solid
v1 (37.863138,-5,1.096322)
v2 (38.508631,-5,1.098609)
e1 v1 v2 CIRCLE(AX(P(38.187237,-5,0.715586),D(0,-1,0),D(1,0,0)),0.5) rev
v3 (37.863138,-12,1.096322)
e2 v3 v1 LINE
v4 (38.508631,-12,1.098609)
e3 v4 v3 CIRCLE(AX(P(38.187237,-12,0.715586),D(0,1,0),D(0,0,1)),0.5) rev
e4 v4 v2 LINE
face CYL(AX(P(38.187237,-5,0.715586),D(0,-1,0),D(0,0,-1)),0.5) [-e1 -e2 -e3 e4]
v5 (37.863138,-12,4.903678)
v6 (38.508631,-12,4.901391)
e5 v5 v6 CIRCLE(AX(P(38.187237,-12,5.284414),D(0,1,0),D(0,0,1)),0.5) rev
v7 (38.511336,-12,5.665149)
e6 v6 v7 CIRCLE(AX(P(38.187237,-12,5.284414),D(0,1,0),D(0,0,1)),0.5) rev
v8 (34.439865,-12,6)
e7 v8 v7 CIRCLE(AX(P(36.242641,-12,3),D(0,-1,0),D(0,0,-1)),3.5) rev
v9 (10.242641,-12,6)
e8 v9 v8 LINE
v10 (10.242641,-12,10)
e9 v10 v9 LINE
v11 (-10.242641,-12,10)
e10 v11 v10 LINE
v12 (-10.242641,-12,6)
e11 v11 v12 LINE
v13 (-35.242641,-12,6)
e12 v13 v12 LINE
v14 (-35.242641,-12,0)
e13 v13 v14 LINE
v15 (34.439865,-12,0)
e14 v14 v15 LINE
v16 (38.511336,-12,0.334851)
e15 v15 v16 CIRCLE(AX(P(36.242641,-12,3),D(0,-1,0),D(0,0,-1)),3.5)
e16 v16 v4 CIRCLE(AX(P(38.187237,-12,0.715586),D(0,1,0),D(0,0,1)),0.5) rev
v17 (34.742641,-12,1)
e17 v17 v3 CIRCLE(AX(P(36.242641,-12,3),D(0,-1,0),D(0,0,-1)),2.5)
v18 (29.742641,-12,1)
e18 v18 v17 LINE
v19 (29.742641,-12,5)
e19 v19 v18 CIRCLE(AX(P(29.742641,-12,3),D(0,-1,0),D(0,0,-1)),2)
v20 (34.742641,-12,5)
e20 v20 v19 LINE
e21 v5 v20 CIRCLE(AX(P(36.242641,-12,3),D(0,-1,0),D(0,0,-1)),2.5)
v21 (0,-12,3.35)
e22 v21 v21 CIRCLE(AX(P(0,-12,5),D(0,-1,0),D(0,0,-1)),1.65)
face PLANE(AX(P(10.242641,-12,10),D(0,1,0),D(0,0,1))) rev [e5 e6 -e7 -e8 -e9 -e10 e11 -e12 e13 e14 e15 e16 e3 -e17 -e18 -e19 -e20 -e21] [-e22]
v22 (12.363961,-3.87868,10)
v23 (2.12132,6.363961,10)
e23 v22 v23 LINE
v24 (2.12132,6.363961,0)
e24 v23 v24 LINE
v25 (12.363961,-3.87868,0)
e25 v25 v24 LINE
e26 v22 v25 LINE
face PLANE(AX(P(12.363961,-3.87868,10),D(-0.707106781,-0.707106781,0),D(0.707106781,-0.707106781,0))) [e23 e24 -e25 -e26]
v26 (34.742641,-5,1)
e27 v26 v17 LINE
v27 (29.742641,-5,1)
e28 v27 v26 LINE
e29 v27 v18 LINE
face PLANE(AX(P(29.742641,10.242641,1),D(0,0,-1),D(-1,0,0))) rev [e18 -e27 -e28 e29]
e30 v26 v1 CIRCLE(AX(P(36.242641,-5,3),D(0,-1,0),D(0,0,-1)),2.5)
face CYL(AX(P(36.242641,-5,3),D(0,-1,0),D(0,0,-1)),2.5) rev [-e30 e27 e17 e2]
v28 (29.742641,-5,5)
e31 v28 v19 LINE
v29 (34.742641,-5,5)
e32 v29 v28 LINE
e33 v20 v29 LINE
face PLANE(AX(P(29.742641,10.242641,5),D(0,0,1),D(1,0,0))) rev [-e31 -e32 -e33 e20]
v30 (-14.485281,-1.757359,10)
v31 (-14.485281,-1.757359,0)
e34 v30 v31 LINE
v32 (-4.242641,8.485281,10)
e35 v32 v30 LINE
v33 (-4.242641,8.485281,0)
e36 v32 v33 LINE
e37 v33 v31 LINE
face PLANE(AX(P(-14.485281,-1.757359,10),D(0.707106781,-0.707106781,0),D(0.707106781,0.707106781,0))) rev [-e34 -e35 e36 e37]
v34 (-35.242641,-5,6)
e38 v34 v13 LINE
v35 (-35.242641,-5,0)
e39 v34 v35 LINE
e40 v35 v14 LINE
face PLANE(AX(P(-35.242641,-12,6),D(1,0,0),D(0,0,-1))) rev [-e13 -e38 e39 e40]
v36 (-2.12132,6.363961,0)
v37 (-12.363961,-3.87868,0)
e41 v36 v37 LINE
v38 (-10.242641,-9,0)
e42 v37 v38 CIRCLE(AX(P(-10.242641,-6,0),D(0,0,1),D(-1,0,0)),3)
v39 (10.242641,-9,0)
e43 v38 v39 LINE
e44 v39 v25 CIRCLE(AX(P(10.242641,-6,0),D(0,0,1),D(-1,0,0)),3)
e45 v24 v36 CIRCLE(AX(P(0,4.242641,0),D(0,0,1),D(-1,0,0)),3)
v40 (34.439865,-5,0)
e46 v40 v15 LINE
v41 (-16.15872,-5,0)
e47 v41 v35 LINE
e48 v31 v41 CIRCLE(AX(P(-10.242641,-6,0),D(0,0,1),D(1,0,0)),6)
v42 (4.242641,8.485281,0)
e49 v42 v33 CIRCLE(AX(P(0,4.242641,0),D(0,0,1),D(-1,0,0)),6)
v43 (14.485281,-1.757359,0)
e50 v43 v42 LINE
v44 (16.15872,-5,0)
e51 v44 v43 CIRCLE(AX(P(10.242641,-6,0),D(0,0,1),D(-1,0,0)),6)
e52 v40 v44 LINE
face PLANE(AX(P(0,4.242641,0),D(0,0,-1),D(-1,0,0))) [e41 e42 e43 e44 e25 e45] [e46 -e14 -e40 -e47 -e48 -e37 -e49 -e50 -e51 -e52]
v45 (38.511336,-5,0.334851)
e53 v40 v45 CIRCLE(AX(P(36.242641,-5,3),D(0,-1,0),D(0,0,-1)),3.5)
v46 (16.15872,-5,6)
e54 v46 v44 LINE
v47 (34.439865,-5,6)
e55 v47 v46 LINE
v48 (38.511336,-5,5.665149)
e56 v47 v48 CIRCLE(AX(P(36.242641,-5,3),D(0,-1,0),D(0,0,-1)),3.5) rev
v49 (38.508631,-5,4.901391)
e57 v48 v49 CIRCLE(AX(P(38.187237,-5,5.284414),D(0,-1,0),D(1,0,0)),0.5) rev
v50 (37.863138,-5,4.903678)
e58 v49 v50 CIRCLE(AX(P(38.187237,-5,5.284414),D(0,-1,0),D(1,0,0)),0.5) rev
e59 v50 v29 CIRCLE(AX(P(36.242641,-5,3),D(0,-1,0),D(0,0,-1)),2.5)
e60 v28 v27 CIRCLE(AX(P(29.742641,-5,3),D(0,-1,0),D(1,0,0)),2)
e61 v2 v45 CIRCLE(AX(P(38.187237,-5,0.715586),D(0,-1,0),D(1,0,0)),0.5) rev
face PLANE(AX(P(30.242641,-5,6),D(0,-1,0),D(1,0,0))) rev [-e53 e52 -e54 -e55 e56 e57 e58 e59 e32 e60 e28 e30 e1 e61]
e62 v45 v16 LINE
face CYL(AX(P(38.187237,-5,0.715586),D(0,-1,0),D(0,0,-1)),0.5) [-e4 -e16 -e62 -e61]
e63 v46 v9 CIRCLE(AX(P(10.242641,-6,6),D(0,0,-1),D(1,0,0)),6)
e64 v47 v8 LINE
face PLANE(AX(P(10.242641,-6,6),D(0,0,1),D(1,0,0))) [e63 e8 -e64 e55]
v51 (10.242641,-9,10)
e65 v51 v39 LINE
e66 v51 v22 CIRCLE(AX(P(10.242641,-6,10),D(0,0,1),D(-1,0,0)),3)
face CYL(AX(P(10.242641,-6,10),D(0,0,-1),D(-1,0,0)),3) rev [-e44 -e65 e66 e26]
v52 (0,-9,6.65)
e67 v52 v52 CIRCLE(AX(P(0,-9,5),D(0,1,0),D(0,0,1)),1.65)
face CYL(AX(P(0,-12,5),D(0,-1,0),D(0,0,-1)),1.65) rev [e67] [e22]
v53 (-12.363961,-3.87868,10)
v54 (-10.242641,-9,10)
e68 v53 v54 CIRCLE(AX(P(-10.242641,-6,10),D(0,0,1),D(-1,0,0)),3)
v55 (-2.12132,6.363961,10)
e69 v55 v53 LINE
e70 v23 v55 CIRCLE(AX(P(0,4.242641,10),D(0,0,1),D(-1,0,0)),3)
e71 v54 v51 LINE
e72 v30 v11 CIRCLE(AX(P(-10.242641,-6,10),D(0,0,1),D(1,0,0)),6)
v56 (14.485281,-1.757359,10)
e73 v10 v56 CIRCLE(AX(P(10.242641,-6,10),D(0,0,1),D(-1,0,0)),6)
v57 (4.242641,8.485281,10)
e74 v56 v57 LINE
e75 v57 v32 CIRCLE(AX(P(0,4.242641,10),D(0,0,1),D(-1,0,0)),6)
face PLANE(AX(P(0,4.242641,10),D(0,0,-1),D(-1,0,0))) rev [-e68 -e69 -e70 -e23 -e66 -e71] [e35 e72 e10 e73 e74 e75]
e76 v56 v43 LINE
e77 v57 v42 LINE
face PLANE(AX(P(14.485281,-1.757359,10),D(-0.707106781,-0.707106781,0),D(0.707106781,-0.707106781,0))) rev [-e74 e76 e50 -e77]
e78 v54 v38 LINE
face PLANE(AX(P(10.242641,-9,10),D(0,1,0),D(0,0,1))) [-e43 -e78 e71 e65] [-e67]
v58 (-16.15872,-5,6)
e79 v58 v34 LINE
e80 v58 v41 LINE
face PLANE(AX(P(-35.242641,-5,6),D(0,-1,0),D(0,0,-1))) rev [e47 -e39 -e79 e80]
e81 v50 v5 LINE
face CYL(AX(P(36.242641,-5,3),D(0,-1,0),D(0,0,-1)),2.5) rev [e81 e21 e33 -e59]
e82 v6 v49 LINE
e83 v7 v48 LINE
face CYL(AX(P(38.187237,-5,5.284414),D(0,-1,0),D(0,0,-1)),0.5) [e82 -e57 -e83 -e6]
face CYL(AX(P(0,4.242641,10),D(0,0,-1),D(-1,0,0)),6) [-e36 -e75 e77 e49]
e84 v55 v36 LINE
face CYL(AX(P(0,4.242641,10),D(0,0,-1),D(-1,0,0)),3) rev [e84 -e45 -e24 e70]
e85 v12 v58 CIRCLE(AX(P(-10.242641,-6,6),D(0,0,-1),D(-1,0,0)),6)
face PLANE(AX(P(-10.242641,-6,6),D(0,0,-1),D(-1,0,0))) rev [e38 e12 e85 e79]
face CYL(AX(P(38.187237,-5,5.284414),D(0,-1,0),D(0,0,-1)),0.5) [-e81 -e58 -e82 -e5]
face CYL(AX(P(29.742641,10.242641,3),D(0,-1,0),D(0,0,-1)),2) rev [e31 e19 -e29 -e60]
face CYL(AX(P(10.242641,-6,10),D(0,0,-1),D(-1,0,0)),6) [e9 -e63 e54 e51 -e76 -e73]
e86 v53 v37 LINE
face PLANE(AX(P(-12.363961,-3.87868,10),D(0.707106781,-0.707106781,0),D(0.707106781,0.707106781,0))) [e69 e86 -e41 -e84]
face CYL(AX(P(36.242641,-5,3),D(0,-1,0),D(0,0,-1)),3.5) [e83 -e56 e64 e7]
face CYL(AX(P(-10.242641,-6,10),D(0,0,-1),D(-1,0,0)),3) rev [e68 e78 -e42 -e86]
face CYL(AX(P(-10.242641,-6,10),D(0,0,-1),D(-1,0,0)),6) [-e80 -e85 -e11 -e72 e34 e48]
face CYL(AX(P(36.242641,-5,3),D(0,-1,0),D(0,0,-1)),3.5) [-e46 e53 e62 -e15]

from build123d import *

# Parameters (mm, degrees)
BOSS_EXTRU_4_DEPTH      = 10
TROU_TARAUD_M43_REACH   = 29.992
TROU_TARAUD_M43_BORE_R  = 1.65
BOSS_EXTRU_5_DEPTH      = 6
BOSS_EXTRU_8_DEPTH      = 7
CONG_1_R                = 0.5
ENL_V_MAT_EXTRU_1_DEPTH = 46.732281958


with BuildPart() as part:
    # Esquisse5 → Boss.-Extru.4 (new body)
    with BuildSketch(Plane.XY):
        with BuildLine():
            Line((-14.485281374, -1.757359313), (-4.242640687, 8.485281374))
            ThreePointArc((-4.242640687, 8.485281374), (0, 10.242640687), (4.242640687, 8.485281374))
            Line((4.242640687, 8.485281374), (14.485281374, -1.757359313))
            ThreePointArc((14.485281374, -1.757359313), (15.785917882, -8.296100594), (10.242640687, -12))
            Line((10.242640687, -12), (-10.242640687, -12))
            ThreePointArc((-10.242640687, -12), (-15.785917882, -8.296100594), (-14.485281374, -1.757359313))
        make_face()
        with BuildLine():
            Line((10.242640687, -9), (-10.242640687, -9))
            ThreePointArc((-10.242640687, -9), (-13.014279285, -7.148050297), (-12.363961031, -3.878679656))
            Line((-12.363961031, -3.878679656), (-2.121320344, 6.363961031))
            ThreePointArc((-2.121320344, 6.363961031), (0, 7.242640687), (2.121320344, 6.363961031))
            Line((2.121320344, 6.363961031), (12.363961031, -3.878679656))
            ThreePointArc((12.363961031, -3.878679656), (13.014279285, -7.148050297), (10.242640687, -9))
        make_face(mode=Mode.SUBTRACT)
    extrude(amount=BOSS_EXTRU_4_DEPTH)

    # Trou taraudé M43 bore (on position points) → Trou taraudé M43 (cut, up to next)
    with BuildSketch(Plane(origin=(0, -12, 5), x_dir=(0, 0, -1), z_dir=(0, -1, 0)), mode=Mode.PRIVATE) as trou_taraud_m43_sk1:
        Circle(TROU_TARAUD_M43_BORE_R)
    trou_taraud_m43_tool1 = extrude(trou_taraud_m43_sk1.sketch, amount=-TROU_TARAUD_M43_REACH, mode=Mode.PRIVATE) & part.part
    add(trou_taraud_m43_tool1.solids().sort_by_distance((0, -12, 5))[0], mode=Mode.SUBTRACT)

    # Esquisse13 → Boss.-Extru.5 (add)
    with BuildSketch(Plane.XY):
        with BuildLine():
            Line((-10.242640687, -12), (-35.242640687, -12))
            Line((-35.242640687, -12), (-35.242640687, -5))
            Line((-35.242640687, -5), (-16.15872047, -5))
            ThreePointArc((-16.15872047, -5), (-14.825216382, -9.872983346), (-10.242640687, -12))
        make_face()
        with BuildLine():
            Line((10.242640687, -12), (30.242640687, -12))
            Line((30.242640687, -12), (30.242640687, -5))
            Line((30.242640687, -5), (16.15872047, -5))
            ThreePointArc((16.15872047, -5), (14.825216382, -9.872983346), (10.242640687, -12))
        make_face()
    extrude(amount=BOSS_EXTRU_5_DEPTH)

    # Esquisse18 → Boss.-Extru.8 (add)
    with BuildSketch(Plane(origin=(0, -12, 0), x_dir=(-1, 0, 0), z_dir=(0, -1, 0))):
        with BuildLine():
            Line((-30.242640687, 0), (-34.439865049, 0))
            ThreePointArc((-34.439865049, 0), (-36.820225395, 0.452013312), (-38.923796238, -0.750243366))
            Line((-38.923796238, -0.750243366), (-38.157751795, -1.393030976))
            ThreePointArc((-38.157751795, -1.393030976), (-33.742640687, -3), (-38.157751795, -4.606969024))
            Line((-38.157751795, -4.606969024), (-38.923796238, -5.249756634))
            ThreePointArc((-38.923796238, -5.249756634), (-36.820225395, -6.452013312), (-34.439865049, -6))
            Line((-34.439865049, -6), (-30.242640687, -6))
            Line((-30.242640687, -6), (-30.242640687, 0))
        make_face()
    extrude(amount=-BOSS_EXTRU_8_DEPTH)

    # Congé1
    cong_1_edges = [part.edges().sort_by_distance(p)[0] for p in [
        (38.157751795, -8.5, 1.393030976),
        (38.923796238, -8.5, 0.750243366),
        (38.923796238, -8.5, 5.249756634),
        (38.157751795, -8.5, 4.606969024),
    ]]
    fillet(cong_1_edges, radius=CONG_1_R - 0.0001)  # a hair under: the kernel refuses the full size

    # Esquisse19 → Enlèv. mat.-Extru.1 (cut, through all)
    with BuildSketch(Plane.XZ.offset(12)):
        with BuildLine():
            Line((29.742640687, 1), (34.742640687, 1))
            ThreePointArc((34.742640687, 1), (33.742640687, 3), (34.742640687, 5))
            Line((34.742640687, 5), (29.742640687, 5))
            ThreePointArc((29.742640687, 5), (27.742640687, 3), (29.742640687, 1))
        make_face()
    extrude(amount=-ENL_V_MAT_EXTRU_1_DEPTH, mode=Mode.SUBTRACT)


solid = part.part
